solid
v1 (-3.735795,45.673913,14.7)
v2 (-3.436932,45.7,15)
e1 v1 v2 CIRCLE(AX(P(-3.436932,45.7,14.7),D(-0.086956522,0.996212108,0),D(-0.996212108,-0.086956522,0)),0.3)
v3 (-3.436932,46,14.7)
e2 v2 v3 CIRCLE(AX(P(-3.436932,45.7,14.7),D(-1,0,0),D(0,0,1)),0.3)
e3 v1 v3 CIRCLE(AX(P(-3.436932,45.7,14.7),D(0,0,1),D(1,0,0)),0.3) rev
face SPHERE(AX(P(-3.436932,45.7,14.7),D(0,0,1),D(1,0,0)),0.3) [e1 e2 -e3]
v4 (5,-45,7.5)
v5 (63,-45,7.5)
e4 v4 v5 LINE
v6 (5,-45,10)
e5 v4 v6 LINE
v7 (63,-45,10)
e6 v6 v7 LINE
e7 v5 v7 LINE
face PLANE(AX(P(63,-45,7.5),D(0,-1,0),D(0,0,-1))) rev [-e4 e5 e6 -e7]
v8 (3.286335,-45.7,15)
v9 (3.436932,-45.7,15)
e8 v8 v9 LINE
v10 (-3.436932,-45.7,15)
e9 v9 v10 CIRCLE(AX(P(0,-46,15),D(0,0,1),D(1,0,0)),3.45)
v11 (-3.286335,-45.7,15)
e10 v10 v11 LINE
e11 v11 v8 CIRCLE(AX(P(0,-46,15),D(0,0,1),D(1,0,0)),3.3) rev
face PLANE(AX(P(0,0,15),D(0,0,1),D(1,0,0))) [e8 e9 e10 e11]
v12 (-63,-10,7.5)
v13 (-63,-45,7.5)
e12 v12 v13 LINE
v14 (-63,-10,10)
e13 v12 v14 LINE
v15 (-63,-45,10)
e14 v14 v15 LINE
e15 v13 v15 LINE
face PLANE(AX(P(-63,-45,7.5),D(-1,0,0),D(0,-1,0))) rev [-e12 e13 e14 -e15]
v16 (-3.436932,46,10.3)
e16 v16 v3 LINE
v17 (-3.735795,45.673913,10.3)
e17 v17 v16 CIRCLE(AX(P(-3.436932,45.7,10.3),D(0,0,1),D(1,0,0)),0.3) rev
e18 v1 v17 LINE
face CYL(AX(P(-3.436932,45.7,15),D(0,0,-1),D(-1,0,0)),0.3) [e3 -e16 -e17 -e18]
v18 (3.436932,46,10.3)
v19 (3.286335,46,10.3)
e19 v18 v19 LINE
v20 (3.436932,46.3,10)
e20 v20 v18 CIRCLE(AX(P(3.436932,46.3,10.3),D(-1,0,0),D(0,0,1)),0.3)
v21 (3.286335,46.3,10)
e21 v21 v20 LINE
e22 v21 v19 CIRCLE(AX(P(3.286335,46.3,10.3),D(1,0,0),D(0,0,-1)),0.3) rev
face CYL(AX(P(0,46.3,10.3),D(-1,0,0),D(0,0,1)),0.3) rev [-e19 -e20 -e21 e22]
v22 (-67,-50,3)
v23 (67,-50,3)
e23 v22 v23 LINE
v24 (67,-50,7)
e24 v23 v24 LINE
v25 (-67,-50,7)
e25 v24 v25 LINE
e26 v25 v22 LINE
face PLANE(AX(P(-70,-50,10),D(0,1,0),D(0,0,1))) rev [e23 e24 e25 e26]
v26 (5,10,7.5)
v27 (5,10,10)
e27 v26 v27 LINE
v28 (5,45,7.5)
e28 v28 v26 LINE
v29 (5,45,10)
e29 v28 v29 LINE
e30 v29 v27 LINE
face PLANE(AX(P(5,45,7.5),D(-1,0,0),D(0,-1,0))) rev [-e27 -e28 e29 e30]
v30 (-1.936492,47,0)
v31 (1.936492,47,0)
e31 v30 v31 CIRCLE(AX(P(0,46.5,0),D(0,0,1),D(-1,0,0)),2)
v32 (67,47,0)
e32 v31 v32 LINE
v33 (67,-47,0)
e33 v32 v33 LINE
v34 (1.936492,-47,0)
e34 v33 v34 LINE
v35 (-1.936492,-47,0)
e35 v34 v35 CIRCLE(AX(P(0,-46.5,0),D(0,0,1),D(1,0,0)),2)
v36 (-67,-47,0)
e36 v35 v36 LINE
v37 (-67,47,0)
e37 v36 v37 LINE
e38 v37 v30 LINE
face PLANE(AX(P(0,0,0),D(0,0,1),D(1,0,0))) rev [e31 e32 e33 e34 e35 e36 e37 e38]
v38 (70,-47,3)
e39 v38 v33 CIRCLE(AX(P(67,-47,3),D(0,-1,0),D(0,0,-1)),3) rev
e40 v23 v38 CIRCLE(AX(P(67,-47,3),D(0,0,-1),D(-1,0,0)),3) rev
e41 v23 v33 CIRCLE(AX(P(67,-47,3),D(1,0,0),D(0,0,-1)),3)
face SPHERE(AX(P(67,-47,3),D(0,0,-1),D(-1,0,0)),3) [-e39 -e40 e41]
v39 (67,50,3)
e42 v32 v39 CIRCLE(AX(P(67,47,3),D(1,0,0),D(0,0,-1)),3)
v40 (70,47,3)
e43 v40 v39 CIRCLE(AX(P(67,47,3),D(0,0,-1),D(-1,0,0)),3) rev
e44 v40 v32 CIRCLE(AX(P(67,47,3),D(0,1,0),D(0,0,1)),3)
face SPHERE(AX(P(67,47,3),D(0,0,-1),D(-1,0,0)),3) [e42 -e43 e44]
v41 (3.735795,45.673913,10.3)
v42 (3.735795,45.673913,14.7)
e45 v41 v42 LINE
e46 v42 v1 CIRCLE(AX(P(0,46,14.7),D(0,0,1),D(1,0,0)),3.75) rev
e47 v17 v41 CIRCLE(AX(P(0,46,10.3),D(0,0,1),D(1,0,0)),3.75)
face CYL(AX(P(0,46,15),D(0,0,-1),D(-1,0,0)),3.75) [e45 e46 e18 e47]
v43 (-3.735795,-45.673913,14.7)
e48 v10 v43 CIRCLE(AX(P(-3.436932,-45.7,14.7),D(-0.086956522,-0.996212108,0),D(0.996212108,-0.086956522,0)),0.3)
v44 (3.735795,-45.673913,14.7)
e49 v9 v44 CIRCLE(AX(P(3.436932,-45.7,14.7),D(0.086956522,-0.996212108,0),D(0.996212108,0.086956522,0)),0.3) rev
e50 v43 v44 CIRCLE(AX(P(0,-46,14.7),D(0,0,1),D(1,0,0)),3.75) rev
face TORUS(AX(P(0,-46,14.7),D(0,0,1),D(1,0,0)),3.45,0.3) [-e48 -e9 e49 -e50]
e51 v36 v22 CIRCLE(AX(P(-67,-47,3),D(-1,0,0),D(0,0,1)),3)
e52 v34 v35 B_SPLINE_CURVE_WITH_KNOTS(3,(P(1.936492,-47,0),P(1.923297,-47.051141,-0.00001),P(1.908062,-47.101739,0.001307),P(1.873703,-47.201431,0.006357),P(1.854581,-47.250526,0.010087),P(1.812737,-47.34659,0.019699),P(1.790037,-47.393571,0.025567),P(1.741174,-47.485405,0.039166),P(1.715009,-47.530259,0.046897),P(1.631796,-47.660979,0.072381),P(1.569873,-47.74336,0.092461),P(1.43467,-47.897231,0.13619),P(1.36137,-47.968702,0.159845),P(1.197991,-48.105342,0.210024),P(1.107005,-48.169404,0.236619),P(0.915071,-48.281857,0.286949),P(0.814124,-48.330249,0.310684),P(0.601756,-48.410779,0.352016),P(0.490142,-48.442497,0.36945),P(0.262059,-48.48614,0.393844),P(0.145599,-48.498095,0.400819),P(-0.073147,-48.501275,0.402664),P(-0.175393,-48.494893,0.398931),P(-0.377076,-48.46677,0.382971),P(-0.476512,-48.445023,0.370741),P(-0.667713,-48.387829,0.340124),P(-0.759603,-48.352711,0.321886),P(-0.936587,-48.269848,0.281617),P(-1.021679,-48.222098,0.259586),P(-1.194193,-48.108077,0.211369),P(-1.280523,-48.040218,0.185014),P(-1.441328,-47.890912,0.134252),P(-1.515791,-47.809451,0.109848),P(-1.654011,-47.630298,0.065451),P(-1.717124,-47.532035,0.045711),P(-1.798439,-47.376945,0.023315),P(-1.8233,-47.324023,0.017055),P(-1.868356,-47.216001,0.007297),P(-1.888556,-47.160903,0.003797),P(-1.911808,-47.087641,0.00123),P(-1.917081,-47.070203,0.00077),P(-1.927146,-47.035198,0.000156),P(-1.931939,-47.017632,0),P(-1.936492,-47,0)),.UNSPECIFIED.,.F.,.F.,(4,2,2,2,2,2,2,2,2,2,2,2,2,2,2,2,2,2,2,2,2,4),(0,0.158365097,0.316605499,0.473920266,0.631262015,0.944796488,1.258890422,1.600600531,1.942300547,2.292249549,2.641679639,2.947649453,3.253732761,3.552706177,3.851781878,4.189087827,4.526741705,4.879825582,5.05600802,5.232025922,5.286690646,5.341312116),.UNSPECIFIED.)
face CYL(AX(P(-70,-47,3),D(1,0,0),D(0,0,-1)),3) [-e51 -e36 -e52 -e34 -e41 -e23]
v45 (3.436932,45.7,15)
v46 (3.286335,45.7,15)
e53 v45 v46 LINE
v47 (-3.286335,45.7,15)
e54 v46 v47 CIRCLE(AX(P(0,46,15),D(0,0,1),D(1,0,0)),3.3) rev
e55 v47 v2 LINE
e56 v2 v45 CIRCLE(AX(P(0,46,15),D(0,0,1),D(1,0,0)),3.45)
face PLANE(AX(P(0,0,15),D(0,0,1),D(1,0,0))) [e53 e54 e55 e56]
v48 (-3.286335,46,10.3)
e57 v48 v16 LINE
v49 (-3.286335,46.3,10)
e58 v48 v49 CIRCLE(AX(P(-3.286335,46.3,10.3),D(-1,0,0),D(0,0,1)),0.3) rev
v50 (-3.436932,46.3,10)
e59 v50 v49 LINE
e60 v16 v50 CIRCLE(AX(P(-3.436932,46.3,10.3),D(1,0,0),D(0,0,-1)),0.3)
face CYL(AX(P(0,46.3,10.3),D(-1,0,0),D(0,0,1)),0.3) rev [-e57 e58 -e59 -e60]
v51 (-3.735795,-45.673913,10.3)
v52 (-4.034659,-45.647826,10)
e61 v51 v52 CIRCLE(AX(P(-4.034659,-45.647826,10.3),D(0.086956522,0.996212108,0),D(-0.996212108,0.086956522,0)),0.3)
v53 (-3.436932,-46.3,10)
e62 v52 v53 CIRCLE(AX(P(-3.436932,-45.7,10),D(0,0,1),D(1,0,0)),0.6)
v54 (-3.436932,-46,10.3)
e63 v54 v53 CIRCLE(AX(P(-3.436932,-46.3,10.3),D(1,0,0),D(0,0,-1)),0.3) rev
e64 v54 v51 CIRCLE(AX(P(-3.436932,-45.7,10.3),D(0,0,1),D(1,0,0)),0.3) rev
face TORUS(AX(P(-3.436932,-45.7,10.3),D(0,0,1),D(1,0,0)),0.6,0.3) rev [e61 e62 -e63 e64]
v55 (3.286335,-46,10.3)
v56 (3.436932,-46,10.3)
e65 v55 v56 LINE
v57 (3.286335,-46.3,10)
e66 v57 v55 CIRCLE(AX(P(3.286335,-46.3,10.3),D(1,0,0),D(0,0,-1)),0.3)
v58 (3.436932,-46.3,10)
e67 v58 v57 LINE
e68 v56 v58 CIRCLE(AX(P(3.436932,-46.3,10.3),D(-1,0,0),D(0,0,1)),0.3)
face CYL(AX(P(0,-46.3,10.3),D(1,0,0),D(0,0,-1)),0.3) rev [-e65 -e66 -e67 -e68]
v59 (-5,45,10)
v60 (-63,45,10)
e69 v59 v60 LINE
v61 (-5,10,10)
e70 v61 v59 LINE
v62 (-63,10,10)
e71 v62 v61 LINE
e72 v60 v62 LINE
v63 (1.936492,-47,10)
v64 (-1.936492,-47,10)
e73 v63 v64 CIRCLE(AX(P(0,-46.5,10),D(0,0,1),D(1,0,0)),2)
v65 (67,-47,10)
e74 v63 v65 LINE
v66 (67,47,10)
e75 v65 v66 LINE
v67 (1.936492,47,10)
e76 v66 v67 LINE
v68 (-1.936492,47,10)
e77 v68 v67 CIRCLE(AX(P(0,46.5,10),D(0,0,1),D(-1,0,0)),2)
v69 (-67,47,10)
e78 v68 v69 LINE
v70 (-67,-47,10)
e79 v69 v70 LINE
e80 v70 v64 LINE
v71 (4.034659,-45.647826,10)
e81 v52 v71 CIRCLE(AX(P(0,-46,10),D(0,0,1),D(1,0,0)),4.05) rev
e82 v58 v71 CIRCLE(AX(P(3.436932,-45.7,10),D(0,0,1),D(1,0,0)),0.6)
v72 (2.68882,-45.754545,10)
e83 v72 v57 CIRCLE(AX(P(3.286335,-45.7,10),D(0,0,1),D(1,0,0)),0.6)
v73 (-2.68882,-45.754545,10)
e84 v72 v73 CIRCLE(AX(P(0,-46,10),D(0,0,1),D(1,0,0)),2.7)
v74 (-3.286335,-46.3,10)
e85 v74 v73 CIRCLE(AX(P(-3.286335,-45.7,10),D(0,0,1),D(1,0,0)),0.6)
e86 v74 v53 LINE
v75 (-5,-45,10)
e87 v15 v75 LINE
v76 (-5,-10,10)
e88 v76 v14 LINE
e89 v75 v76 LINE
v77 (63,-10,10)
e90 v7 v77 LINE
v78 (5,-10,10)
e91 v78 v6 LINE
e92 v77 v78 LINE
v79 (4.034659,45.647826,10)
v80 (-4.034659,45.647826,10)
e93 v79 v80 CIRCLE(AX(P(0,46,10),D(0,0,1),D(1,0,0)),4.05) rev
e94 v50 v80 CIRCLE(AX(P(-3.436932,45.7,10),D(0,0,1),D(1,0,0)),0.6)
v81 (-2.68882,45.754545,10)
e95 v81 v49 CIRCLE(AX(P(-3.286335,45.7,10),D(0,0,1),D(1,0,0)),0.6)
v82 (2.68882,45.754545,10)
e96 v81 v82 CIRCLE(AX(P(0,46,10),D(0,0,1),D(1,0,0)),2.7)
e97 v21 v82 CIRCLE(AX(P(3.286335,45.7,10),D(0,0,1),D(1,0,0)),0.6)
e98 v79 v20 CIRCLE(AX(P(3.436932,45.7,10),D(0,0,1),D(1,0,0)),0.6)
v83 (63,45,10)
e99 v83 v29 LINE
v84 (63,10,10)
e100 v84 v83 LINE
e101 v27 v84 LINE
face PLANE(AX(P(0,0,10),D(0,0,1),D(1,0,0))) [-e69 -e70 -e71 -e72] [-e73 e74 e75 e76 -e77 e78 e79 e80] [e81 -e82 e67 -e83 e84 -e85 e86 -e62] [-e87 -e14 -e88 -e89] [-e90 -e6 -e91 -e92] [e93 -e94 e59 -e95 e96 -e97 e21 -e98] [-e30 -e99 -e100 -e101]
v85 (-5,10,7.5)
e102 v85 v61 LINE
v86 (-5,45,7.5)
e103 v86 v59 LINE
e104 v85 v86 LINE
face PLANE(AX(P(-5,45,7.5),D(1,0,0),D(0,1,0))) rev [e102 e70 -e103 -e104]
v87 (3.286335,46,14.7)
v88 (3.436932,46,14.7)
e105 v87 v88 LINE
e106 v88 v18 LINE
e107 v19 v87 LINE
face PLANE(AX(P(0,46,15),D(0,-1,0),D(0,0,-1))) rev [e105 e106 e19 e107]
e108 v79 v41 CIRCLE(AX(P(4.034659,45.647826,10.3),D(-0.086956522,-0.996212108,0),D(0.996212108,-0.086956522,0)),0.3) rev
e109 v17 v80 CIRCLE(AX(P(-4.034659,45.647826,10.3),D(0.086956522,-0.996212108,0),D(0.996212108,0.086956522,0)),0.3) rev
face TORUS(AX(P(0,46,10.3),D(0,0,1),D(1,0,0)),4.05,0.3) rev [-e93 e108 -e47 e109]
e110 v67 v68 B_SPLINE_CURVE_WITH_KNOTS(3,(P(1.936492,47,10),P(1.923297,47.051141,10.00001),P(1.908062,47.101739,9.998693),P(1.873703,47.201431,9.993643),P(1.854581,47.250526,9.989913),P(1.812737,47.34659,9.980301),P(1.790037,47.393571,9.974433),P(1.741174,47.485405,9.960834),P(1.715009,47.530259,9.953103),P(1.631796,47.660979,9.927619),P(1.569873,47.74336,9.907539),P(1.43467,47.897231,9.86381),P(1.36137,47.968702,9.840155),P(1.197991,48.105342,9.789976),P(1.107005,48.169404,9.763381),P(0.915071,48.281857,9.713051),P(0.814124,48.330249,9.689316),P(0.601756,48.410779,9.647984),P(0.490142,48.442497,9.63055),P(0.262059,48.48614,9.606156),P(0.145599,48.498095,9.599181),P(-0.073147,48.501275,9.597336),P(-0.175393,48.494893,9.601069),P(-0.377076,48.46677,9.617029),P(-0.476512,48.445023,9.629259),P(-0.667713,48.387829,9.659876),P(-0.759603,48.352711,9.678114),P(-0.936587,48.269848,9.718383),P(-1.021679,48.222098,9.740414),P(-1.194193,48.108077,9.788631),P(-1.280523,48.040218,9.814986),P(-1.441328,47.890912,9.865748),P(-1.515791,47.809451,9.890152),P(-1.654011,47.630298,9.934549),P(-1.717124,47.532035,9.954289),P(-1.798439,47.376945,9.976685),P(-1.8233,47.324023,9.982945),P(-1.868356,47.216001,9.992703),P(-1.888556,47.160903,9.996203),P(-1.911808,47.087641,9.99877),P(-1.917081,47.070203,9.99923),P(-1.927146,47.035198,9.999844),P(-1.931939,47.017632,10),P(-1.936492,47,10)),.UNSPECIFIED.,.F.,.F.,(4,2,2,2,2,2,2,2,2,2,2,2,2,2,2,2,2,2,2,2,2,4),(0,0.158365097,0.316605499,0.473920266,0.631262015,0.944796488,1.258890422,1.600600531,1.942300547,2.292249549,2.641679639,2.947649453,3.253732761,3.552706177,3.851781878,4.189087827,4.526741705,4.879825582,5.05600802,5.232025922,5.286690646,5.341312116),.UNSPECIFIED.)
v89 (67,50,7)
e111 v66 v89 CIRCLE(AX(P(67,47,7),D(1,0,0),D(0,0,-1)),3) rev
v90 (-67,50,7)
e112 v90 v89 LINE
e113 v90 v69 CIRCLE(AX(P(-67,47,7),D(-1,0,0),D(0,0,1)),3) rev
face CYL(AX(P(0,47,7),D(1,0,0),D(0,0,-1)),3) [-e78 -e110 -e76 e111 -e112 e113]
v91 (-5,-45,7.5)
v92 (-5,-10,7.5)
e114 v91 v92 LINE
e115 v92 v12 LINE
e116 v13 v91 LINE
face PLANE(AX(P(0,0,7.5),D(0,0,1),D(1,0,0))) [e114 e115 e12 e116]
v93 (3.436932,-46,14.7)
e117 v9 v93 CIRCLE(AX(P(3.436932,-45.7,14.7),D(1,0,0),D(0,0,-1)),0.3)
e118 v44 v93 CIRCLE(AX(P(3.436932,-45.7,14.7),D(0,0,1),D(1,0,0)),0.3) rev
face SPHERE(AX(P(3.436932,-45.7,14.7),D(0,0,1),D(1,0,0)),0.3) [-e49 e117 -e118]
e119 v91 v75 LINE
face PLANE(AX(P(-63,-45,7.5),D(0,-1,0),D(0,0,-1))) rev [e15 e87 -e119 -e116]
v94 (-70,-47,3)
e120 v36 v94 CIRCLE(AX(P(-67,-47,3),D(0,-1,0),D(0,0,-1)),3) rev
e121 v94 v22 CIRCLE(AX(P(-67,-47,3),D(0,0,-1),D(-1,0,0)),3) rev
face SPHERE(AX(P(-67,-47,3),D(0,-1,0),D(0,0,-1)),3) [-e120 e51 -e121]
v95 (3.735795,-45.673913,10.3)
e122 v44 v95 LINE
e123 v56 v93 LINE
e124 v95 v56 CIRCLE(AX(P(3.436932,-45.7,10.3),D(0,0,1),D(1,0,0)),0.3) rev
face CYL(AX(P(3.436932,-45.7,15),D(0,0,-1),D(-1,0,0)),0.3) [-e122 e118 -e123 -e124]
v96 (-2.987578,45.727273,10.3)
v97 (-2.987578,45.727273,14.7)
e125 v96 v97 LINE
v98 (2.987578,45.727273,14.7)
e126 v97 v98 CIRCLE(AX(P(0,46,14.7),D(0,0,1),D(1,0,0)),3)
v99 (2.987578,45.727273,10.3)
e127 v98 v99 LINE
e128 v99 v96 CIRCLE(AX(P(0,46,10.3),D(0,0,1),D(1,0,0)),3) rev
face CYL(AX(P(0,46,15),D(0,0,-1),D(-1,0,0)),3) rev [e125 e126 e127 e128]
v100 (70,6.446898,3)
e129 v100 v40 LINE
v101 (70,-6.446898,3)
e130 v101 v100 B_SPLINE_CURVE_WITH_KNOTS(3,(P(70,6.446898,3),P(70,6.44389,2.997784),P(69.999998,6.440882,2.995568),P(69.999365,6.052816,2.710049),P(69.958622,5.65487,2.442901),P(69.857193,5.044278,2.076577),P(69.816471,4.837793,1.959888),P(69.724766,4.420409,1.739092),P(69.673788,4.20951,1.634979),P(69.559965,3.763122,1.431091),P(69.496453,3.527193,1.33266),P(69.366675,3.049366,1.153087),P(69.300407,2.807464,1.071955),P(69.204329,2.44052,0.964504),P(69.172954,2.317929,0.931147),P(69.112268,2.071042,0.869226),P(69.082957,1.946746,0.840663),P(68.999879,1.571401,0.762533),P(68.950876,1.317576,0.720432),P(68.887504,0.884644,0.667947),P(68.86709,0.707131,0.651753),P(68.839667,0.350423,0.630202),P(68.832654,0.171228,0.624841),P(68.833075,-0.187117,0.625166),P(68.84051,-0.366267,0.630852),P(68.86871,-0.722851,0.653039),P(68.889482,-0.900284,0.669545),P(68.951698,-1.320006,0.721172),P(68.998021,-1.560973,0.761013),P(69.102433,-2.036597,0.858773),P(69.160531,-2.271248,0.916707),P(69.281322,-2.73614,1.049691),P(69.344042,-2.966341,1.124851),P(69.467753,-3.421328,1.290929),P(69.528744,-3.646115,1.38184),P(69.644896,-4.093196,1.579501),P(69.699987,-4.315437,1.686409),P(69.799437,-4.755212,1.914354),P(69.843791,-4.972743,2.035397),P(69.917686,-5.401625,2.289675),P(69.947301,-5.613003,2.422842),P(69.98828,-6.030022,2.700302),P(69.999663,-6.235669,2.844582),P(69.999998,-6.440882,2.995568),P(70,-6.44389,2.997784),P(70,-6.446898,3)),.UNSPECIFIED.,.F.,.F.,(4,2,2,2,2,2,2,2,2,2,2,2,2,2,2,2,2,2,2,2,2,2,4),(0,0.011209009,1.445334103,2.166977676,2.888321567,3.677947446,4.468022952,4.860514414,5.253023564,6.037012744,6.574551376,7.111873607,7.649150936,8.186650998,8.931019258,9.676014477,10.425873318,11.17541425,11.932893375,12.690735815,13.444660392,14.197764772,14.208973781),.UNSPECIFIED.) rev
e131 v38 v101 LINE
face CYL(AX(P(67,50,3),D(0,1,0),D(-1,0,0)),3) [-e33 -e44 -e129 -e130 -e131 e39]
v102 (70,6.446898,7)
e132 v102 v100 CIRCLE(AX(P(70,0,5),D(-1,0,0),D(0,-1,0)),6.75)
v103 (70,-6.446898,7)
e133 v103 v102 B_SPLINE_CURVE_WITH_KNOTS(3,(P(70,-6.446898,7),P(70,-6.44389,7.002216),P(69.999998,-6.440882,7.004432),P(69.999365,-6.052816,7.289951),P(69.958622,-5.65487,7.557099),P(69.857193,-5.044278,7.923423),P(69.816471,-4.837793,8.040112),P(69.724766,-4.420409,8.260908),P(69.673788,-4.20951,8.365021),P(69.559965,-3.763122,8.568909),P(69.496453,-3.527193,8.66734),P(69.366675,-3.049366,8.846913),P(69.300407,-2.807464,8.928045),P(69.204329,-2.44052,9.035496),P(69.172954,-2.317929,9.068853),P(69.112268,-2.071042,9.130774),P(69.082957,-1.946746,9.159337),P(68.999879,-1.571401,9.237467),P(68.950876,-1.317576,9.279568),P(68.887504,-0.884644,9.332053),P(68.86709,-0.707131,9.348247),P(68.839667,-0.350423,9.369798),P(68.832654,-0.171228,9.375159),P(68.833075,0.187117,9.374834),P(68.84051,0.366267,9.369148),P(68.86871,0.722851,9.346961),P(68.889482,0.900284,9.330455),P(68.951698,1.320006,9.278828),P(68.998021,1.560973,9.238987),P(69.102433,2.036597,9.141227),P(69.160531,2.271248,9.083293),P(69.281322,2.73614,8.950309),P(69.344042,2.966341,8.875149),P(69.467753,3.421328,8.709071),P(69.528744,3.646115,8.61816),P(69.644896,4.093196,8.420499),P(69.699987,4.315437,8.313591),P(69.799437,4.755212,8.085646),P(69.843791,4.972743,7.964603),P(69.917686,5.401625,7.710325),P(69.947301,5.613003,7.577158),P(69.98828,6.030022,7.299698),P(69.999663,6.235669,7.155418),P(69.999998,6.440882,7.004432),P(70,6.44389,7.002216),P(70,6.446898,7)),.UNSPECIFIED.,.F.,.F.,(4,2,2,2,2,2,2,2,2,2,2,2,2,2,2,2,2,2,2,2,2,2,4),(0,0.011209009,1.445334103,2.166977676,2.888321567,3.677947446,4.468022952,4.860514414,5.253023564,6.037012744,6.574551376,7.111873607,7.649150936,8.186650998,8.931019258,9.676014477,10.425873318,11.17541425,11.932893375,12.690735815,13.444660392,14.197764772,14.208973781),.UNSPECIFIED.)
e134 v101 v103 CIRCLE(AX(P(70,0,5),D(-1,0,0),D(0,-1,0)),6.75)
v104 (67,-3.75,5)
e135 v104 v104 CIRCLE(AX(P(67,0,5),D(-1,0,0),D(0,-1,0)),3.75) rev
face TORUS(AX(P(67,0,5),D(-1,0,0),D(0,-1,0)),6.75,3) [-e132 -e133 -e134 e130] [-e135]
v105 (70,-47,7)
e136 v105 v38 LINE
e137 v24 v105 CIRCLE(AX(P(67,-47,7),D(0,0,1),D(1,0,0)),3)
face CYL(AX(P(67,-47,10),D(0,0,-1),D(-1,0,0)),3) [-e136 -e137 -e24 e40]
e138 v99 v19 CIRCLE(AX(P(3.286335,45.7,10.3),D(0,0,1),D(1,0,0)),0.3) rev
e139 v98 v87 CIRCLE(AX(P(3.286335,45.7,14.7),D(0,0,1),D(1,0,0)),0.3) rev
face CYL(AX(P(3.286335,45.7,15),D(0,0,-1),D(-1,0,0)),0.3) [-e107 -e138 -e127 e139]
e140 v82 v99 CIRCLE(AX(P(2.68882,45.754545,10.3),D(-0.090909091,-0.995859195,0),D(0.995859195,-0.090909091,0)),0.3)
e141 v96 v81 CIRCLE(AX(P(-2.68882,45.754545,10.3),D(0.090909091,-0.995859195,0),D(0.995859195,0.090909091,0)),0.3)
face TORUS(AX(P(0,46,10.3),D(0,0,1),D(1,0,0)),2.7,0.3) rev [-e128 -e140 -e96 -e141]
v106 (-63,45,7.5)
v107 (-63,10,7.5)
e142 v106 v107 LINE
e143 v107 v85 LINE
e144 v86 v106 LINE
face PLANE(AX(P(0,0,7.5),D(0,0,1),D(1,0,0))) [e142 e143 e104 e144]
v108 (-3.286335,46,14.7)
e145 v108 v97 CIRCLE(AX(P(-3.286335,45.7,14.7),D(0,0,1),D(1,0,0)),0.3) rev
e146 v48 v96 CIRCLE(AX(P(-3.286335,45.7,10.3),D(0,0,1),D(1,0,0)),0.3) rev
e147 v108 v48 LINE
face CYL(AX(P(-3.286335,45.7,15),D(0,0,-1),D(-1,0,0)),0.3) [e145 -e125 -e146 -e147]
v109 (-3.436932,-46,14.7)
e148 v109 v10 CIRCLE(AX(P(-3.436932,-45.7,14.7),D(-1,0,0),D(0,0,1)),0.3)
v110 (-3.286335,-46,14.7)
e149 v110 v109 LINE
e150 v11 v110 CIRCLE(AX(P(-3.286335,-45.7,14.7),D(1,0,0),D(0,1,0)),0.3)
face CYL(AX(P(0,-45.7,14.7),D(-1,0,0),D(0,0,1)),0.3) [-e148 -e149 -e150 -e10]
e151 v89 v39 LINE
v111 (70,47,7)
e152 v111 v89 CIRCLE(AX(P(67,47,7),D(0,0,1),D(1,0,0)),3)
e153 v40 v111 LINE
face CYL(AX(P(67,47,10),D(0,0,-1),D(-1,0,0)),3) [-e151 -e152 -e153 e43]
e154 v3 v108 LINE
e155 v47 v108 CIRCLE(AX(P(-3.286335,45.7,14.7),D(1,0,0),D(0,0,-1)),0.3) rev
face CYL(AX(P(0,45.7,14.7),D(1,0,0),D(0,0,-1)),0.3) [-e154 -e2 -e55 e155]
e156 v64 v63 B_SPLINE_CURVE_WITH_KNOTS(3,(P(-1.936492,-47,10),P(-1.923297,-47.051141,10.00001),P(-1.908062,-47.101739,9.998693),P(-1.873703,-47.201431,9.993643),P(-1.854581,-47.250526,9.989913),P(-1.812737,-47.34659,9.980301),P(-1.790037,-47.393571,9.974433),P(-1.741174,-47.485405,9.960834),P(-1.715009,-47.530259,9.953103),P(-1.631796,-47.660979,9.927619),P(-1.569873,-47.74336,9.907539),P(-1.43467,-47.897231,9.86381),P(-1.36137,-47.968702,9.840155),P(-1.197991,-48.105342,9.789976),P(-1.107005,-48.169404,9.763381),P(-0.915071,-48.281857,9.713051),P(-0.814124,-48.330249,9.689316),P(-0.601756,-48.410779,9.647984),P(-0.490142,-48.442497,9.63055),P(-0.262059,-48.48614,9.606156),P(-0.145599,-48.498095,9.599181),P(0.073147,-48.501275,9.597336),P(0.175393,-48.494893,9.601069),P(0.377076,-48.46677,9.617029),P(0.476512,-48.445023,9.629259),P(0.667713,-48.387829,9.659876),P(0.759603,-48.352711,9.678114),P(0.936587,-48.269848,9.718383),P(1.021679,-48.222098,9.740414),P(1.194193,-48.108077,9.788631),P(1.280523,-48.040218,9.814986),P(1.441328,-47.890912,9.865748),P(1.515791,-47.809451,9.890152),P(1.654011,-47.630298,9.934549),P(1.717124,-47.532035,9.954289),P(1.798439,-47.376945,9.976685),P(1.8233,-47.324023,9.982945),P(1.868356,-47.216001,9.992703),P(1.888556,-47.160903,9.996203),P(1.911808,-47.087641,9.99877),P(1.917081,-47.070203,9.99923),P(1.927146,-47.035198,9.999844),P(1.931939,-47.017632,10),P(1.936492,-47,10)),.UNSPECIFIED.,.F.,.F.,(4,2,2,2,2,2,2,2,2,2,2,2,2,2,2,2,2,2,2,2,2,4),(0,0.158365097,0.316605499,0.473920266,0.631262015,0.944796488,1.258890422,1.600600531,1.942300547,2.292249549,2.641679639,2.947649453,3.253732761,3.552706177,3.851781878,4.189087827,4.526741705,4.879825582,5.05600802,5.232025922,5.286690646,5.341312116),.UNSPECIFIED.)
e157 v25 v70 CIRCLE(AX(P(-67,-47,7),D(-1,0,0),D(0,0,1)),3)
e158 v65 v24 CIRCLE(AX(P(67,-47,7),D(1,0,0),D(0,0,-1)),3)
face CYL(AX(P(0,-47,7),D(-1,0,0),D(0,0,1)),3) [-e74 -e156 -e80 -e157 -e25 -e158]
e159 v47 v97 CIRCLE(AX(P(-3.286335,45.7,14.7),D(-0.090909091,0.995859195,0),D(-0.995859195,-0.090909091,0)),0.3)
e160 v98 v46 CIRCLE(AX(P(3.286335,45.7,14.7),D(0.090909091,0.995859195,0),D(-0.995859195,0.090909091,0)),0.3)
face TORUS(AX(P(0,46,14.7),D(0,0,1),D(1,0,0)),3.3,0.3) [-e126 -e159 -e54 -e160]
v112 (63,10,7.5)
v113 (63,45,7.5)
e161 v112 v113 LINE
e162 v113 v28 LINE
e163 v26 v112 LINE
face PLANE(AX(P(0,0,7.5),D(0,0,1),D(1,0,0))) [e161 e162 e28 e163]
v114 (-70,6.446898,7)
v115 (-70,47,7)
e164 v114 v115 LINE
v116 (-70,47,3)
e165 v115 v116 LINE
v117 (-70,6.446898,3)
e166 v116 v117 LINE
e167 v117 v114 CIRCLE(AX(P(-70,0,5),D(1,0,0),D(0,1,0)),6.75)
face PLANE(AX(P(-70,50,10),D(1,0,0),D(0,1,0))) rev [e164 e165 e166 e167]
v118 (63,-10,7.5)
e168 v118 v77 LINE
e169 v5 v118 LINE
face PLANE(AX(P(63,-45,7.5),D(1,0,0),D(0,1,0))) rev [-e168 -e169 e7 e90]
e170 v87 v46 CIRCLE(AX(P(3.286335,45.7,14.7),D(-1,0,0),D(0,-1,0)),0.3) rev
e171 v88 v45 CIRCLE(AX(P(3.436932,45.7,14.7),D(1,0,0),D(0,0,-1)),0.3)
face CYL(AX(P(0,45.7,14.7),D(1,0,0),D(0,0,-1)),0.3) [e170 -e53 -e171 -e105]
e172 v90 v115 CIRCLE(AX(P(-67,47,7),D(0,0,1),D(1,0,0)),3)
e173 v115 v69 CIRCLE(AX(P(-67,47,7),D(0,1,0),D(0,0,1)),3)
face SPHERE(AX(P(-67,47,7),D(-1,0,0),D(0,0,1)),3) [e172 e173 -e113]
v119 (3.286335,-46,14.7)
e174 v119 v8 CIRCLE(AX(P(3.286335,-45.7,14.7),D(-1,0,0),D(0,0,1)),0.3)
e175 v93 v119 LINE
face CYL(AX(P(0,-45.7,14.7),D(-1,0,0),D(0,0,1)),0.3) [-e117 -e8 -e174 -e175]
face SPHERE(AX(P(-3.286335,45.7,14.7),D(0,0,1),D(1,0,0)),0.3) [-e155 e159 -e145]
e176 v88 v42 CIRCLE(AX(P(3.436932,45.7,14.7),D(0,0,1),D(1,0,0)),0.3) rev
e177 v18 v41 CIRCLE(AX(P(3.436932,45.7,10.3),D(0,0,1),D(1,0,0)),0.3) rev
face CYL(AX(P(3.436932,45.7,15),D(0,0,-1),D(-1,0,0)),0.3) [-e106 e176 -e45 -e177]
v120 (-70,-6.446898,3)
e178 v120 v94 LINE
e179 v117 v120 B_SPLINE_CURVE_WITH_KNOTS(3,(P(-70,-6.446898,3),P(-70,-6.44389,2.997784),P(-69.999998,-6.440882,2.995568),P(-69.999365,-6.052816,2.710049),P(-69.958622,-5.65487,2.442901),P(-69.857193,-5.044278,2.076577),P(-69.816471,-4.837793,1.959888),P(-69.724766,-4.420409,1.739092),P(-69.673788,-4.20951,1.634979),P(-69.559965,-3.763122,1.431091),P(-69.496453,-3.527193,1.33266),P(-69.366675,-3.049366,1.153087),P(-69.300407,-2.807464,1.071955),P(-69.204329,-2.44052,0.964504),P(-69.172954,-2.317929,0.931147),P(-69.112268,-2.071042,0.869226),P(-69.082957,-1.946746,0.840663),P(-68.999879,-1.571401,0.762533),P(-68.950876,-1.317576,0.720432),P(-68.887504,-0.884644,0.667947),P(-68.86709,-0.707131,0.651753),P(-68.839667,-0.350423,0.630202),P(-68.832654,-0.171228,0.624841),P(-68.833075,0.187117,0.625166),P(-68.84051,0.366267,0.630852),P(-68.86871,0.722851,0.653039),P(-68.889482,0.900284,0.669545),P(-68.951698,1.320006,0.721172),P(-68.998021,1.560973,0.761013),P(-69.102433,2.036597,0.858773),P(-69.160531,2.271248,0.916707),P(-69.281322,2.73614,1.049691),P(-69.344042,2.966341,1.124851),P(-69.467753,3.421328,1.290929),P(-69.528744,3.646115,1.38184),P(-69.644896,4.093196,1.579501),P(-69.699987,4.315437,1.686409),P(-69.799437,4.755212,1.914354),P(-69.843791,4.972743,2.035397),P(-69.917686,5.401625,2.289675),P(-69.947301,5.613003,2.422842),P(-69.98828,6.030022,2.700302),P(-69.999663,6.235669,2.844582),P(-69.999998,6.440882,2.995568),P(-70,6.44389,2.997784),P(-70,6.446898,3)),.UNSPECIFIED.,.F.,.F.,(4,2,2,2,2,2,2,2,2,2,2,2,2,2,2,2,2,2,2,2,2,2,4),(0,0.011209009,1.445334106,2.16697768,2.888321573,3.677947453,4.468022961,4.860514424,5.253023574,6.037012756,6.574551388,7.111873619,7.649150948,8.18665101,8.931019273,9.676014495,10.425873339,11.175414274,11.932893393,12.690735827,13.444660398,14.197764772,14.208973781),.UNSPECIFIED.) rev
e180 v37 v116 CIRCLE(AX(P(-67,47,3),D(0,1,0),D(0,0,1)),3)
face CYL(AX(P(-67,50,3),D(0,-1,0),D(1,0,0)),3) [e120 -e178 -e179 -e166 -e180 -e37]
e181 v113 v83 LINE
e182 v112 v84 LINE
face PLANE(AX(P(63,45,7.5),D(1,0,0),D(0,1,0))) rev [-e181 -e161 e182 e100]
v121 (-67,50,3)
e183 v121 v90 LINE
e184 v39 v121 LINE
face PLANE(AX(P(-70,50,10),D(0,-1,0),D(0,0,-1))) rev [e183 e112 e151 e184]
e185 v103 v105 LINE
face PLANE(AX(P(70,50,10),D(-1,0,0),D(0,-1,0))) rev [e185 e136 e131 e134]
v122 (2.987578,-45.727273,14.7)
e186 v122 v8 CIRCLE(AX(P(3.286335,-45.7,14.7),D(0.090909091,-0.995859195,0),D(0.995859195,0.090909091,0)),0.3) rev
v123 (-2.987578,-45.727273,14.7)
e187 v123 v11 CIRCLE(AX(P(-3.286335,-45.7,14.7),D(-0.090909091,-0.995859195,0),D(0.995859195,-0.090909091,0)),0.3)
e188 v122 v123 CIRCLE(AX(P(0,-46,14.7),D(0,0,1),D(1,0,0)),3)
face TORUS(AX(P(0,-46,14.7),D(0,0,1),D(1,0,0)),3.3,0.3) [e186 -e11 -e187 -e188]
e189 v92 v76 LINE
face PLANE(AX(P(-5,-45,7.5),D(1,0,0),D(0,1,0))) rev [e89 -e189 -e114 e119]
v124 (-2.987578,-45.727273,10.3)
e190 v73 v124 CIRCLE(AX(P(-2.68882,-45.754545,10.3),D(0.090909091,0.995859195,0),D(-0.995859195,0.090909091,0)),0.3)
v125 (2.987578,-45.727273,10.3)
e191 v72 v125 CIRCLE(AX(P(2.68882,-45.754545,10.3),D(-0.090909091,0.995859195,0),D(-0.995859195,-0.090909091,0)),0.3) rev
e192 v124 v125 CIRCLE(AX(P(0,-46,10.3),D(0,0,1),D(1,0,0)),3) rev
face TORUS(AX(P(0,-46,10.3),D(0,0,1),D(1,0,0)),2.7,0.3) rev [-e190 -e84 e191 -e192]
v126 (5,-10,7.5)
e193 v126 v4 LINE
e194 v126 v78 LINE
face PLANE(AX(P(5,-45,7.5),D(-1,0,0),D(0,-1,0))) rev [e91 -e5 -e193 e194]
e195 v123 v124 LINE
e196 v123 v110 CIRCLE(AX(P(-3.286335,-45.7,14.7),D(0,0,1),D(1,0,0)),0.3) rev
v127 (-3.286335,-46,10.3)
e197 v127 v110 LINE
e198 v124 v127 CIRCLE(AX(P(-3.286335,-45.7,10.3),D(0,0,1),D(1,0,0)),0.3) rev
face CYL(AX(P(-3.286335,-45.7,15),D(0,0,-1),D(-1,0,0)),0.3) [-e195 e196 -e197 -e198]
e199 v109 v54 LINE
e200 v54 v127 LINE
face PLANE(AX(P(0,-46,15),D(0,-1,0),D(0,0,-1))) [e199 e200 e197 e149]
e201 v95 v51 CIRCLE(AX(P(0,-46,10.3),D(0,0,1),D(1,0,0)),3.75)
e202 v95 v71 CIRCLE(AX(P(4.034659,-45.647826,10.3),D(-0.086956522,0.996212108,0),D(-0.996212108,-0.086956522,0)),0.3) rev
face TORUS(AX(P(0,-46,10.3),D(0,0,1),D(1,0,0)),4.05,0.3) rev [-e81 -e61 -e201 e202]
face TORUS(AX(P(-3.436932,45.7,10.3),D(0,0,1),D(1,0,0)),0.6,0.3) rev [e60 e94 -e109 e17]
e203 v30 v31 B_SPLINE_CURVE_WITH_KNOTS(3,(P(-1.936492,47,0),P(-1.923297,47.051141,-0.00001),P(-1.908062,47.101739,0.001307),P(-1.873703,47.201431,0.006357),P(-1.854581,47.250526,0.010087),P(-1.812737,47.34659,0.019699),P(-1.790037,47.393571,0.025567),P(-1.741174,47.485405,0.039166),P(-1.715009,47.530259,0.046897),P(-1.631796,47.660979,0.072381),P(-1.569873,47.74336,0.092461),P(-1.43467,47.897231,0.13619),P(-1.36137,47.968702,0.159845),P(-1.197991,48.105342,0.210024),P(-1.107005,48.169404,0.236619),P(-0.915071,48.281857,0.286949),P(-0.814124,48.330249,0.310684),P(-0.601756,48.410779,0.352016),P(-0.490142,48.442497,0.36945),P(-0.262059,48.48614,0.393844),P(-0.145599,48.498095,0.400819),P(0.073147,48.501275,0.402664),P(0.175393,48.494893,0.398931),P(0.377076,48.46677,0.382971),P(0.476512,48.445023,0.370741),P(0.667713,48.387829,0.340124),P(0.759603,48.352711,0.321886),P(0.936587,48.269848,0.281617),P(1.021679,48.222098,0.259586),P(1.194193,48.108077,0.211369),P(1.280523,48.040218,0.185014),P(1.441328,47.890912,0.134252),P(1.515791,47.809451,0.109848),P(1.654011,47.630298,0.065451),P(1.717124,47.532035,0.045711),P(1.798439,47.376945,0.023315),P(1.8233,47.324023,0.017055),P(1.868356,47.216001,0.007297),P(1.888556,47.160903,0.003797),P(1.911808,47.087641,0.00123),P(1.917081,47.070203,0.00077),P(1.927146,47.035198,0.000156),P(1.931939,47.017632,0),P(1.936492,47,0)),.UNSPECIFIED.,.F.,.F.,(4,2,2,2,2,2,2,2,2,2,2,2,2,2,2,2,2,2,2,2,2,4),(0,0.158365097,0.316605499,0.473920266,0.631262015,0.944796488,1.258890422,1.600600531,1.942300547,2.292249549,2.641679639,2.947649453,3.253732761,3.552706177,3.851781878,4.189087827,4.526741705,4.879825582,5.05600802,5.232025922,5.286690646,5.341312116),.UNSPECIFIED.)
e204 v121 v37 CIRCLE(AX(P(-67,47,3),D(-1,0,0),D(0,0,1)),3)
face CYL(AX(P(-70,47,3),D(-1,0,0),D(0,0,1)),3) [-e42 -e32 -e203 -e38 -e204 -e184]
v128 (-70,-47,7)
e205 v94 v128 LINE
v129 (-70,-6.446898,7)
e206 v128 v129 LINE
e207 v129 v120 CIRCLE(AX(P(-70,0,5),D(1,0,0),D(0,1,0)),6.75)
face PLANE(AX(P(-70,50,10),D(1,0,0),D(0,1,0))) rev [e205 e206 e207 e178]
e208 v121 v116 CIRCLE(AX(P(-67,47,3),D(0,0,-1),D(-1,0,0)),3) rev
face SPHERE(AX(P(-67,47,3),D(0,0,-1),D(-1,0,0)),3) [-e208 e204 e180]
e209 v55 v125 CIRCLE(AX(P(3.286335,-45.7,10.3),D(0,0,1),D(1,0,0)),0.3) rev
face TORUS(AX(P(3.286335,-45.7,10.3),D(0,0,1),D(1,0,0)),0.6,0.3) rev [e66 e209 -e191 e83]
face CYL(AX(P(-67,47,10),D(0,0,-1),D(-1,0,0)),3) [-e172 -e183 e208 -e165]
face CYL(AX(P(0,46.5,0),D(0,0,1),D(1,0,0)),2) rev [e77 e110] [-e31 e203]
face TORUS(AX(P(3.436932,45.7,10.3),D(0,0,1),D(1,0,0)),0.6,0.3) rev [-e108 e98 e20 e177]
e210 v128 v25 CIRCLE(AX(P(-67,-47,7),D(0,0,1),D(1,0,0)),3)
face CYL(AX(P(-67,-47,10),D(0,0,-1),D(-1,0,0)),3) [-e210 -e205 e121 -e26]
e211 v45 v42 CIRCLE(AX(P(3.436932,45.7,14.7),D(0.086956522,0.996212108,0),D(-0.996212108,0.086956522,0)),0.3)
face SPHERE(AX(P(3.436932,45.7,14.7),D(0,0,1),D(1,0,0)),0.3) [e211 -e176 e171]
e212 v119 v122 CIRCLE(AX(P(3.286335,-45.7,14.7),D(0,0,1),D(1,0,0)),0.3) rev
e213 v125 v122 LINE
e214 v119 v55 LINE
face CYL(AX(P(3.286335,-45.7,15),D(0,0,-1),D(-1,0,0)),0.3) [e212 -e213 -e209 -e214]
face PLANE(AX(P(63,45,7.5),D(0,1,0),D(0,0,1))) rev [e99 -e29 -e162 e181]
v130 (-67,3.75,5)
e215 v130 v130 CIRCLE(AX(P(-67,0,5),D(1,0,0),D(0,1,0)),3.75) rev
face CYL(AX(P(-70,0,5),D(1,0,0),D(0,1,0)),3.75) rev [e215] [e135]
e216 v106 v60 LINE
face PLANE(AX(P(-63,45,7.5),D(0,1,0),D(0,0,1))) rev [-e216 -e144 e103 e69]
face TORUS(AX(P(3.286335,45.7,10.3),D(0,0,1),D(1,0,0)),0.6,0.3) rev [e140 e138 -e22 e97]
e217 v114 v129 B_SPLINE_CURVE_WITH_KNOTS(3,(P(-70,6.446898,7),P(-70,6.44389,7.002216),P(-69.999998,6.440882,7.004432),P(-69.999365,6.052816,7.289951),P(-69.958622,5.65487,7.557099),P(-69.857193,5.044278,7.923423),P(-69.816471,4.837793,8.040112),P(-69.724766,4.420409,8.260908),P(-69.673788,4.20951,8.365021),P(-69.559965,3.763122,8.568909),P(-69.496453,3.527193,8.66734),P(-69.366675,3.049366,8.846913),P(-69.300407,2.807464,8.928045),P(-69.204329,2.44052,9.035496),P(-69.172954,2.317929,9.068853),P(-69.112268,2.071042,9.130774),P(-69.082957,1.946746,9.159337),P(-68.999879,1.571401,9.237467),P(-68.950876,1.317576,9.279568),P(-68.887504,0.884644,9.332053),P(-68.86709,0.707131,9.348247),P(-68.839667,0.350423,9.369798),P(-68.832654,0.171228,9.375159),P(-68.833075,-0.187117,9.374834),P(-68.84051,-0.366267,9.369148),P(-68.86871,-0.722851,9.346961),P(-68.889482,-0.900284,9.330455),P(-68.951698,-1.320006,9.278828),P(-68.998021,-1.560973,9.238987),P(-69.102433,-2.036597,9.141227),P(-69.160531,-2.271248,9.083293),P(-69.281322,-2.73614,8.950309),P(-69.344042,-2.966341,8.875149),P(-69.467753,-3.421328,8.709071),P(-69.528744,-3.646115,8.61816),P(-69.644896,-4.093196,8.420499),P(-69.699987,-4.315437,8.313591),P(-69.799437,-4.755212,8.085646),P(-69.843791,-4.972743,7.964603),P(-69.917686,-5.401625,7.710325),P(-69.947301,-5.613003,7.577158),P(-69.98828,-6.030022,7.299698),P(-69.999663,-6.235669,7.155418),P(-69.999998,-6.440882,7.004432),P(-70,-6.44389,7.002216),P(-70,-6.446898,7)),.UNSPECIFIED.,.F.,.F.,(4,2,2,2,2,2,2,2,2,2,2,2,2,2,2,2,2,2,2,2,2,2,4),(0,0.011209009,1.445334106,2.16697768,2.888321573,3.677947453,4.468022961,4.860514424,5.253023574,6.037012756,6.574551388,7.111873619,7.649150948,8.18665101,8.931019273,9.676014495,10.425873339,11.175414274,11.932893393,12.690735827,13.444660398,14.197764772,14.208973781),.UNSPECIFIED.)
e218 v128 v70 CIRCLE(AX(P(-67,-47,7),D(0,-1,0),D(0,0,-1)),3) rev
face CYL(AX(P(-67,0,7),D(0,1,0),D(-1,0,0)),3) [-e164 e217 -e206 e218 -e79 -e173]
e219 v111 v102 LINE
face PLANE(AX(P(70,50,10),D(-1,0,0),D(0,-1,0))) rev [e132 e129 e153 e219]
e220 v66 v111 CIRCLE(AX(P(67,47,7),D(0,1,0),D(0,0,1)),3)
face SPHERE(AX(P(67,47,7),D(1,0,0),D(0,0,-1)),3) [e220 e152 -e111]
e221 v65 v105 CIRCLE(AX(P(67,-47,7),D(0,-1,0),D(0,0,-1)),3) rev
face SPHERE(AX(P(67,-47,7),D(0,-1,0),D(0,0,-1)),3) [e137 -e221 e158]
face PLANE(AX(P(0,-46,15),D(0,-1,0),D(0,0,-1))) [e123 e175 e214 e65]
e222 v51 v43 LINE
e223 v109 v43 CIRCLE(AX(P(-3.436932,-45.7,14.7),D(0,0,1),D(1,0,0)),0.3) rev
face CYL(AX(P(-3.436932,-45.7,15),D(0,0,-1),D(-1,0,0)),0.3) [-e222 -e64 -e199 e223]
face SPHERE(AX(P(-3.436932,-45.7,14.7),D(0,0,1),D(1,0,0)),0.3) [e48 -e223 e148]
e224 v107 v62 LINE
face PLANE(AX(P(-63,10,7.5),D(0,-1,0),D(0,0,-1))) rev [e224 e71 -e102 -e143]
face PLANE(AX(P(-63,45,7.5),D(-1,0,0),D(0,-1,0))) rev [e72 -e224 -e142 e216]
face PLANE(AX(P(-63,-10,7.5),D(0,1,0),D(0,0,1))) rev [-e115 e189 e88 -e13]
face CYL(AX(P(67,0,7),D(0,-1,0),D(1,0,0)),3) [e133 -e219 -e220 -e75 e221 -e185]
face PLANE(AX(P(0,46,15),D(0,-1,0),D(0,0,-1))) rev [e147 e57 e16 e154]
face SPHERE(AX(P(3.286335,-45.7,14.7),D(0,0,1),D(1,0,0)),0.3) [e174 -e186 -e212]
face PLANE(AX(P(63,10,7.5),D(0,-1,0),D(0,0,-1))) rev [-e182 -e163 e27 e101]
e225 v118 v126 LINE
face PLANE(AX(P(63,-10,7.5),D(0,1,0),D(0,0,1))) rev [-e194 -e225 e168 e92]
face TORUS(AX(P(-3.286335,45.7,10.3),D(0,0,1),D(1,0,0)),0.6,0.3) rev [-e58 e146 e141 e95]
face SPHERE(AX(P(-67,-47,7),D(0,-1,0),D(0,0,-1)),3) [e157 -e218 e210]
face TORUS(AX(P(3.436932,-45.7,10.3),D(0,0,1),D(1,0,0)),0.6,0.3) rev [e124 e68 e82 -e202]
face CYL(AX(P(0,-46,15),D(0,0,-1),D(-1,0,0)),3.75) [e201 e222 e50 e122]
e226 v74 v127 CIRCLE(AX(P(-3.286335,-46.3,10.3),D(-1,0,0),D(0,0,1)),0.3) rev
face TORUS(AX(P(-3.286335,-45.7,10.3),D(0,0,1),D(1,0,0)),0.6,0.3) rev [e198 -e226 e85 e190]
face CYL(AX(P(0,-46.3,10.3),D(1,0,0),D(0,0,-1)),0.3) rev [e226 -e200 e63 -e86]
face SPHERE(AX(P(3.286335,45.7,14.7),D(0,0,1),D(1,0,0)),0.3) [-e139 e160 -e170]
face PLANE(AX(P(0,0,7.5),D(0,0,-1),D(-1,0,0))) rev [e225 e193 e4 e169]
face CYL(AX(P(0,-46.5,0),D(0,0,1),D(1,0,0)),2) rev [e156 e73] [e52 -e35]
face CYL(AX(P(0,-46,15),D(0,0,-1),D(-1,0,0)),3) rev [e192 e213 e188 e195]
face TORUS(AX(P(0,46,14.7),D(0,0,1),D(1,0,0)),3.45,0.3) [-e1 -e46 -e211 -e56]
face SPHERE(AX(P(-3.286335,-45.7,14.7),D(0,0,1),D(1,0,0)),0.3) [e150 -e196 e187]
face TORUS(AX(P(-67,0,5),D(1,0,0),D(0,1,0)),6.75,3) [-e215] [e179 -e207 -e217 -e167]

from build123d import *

# Parameters (mm, degrees)
SKETCH1_W           = 140
SKETCH1_H           = 100
BOSS_EXTRUDE1_DEPTH = 10
SKETCH2_W           = 58
SKETCH2_H           = 35
CUT_EXTRUDE1_DEPTH  = 2.5
SKETCH4_R           = 3.75
CUT_EXTRUDE2_DEPTH  = 140
BOSS_EXTRUDE3_DEPTH = 5
SKETCH6_R           = 2
CUT_EXTRUDE3_DEPTH  = 10
FILLET1_R           = 3
FILLET7_R           = 0.3


with BuildPart() as part:
    # Sketch1 → Boss-Extrude1 (new body)
    with BuildSketch(Plane.XY):
        Rectangle(SKETCH1_W, SKETCH1_H)
    extrude(amount=BOSS_EXTRUDE1_DEPTH)

    # Sketch2 → Cut-Extrude1 (cut)
    with BuildSketch(Plane.XY.offset(10)):
        with Locations((-34, 27.5)):
            Rectangle(SKETCH2_W, SKETCH2_H)
        with Locations((34, 27.5)):
            Rectangle(SKETCH2_W, SKETCH2_H)
        with Locations((34, -27.5)):
            Rectangle(SKETCH2_W, SKETCH2_H)
        with Locations((-34, -27.5)):
            Rectangle(SKETCH2_W, SKETCH2_H)
    extrude(amount=-CUT_EXTRUDE1_DEPTH, mode=Mode.SUBTRACT)

    # Sketch4 → Cut-Extrude2 (cut)
    with BuildSketch(Plane(origin=(70, 0, 0), x_dir=(0, 0, -1), z_dir=(1, 0, 0))):
        with Locations(Location((-5, 0, 0), (0, 0, 90))):
            Circle(SKETCH4_R)
    extrude(amount=-CUT_EXTRUDE2_DEPTH, mode=Mode.SUBTRACT)

    # Sketch5 → Boss-Extrude3 (add)
    with BuildSketch(Plane.XY.offset(10)):
        with BuildLine():
            ThreePointArc((-3.75, 46), (0, 42.25), (3.75, 46))
            Line((3.75, 46), (3, 46))
            ThreePointArc((3, 46), (0, 43), (-3, 46))
            Line((-3, 46), (-3.75, 46))
        make_face()
        with BuildLine():
            Line((3, -46), (3.75, -46))
            ThreePointArc((3.75, -46), (0, -42.25), (-3.75, -46))
            Line((-3.75, -46), (-3, -46))
            ThreePointArc((-3, -46), (0, -43), (3, -46))
        make_face()
    extrude(amount=BOSS_EXTRUDE3_DEPTH)

    # Sketch6 → Cut-Extrude3 (cut)
    with BuildSketch(Plane.XY.offset(10)):
        with Locations((0, -46.5)):
            Circle(SKETCH6_R)
        with Locations(Location((0, 46.5, 0), (0, 0, 180))):
            Circle(SKETCH6_R)
    extrude(amount=-CUT_EXTRUDE3_DEPTH, mode=Mode.SUBTRACT)

    # Fillet1
    # the kernel refuses this fillet: 3 mm, written as the material it takes off along each edge
    with BuildSketch(Plane(origin=(-67, -47, 7), x_dir=(0, 0, 1), z_dir=(-1, 0, 0))) as fillet1_piece_1_section:
        Polygon((0, 0), (FILLET1_R, 0), (FILLET1_R, -FILLET1_R), (0, -FILLET1_R), align=None)
    fillet1_piece_1 = extrude(amount=FILLET1_R, mode=Mode.PRIVATE)
    fillet1_piece_1 = fillet1_piece_1 - Plane(origin=(-67, -47, 7), x_dir=(0, 0.7071067811865475, -0.7071067811865475), z_dir=(-1, 0, 0)) * Sphere(FILLET1_R, mode=Mode.PRIVATE)
    add(fillet1_piece_1, mode=Mode.SUBTRACT)
    with BuildSketch(Plane(origin=(-67, 47, 7), x_dir=(-1, 0, 0), z_dir=(0, 1, 0))) as fillet1_piece_2_section:
        Polygon((0, 0), (FILLET1_R, 0), (FILLET1_R, FILLET1_R), (0, FILLET1_R), align=None)
    fillet1_piece_2 = extrude(amount=FILLET1_R, mode=Mode.PRIVATE)
    fillet1_piece_2 = fillet1_piece_2 - Plane(origin=(-67, 47, 7), x_dir=(0.7071067811865475, 0, -0.7071067811865475), z_dir=(0, 1, 0)) * Sphere(FILLET1_R, mode=Mode.PRIVATE)
    add(fillet1_piece_2, mode=Mode.SUBTRACT)
    with BuildSketch(Plane(origin=(67, -47, 7), x_dir=(0, 0, 1), z_dir=(1, 0, 0))) as fillet1_piece_3_section:
        Polygon((0, 0), (FILLET1_R, 0), (FILLET1_R, FILLET1_R), (0, FILLET1_R), align=None)
    fillet1_piece_3 = extrude(amount=FILLET1_R, mode=Mode.PRIVATE)
    fillet1_piece_3 = fillet1_piece_3 - Plane(origin=(67, -47, 7), x_dir=(0, 0.7071067811865475, -0.7071067811865475), z_dir=(1, 0, 0)) * Sphere(FILLET1_R, mode=Mode.PRIVATE)
    add(fillet1_piece_3, mode=Mode.SUBTRACT)
    with BuildSketch(Plane(origin=(67, 47, 7), x_dir=(1, 0, 0), z_dir=(0, 1, 0))) as fillet1_piece_4_section:
        Polygon((0, 0), (FILLET1_R, 0), (FILLET1_R, -FILLET1_R), (0, -FILLET1_R), align=None)
    fillet1_piece_4 = extrude(amount=FILLET1_R, mode=Mode.PRIVATE)
    fillet1_piece_4 = fillet1_piece_4 - Plane(origin=(67, 47, 7), x_dir=(-0.7071067811865475, 0, -0.7071067811865475), z_dir=(0, 1, 0)) * Sphere(FILLET1_R, mode=Mode.PRIVATE)
    add(fillet1_piece_4, mode=Mode.SUBTRACT)
    with BuildSketch(Plane(origin=(67, -47, 3), x_dir=(0, 0, -1), z_dir=(1, 0, 0))) as fillet1_piece_5_section:
        Polygon((0, 0), (FILLET1_R, 0), (FILLET1_R, -FILLET1_R), (0, -FILLET1_R), align=None)
    fillet1_piece_5 = extrude(amount=FILLET1_R, mode=Mode.PRIVATE)
    fillet1_piece_5 = fillet1_piece_5 - Plane(origin=(67, -47, 3), x_dir=(0, 0.7071067811865475, 0.7071067811865475), z_dir=(1, 0, 0)) * Sphere(FILLET1_R, mode=Mode.PRIVATE)
    add(fillet1_piece_5, mode=Mode.SUBTRACT)
    with BuildSketch(Plane(origin=(-67, -47, 3), x_dir=(0, 0, -1), z_dir=(-1, 0, 0))) as fillet1_piece_6_section:
        Polygon((0, 0), (FILLET1_R, 0), (FILLET1_R, FILLET1_R), (0, FILLET1_R), align=None)
    fillet1_piece_6 = extrude(amount=FILLET1_R, mode=Mode.PRIVATE)
    fillet1_piece_6 = fillet1_piece_6 - Plane(origin=(-67, -47, 3), x_dir=(0, 0.7071067811865475, 0.7071067811865475), z_dir=(-1, 0, 0)) * Sphere(FILLET1_R, mode=Mode.PRIVATE)
    add(fillet1_piece_6, mode=Mode.SUBTRACT)
    with BuildSketch(Plane(origin=(-67, 47, 3), x_dir=(-1, 0, 0), z_dir=(0, 1, 0))) as fillet1_piece_7_section:
        Polygon((0, 0), (FILLET1_R, 0), (FILLET1_R, -FILLET1_R), (0, -FILLET1_R), align=None)
    fillet1_piece_7 = extrude(amount=FILLET1_R, mode=Mode.PRIVATE)
    fillet1_piece_7 = fillet1_piece_7 - Plane(origin=(-67, 47, 3), x_dir=(0.7071067811865475, 0, 0.7071067811865475), z_dir=(0, 1, 0)) * Sphere(FILLET1_R, mode=Mode.PRIVATE)
    add(fillet1_piece_7, mode=Mode.SUBTRACT)
    with BuildSketch(Plane(origin=(67, 47, 3), x_dir=(1, 0, 0), z_dir=(0, 1, 0))) as fillet1_piece_8_section:
        Polygon((0, 0), (FILLET1_R, 0), (FILLET1_R, FILLET1_R), (0, FILLET1_R), align=None)
    fillet1_piece_8 = extrude(amount=FILLET1_R, mode=Mode.PRIVATE)
    fillet1_piece_8 = fillet1_piece_8 - Plane(origin=(67, 47, 3), x_dir=(-0.7071067811865475, 0, 0.7071067811865475), z_dir=(0, 1, 0)) * Sphere(FILLET1_R, mode=Mode.PRIVATE)
    add(fillet1_piece_8, mode=Mode.SUBTRACT)
    with BuildSketch(Plane(origin=(-70, -47, 10), x_dir=(0, 0, -1), z_dir=(0, 1, 0)), Plane(origin=(70, 47, 10), x_dir=(0, 0, -1), z_dir=(0, -1, 0))) as fillet1_piece_9:
        with BuildLine():
            CenterArc((FILLET1_R, -FILLET1_R), FILLET1_R, 90, 90)
            Line((0, -FILLET1_R), (0, 0))
            Line((0, 0), (FILLET1_R, 0))
        make_face()
    extrude(amount=94, mode=Mode.SUBTRACT)
    with BuildSketch(Plane(origin=(67, -50, 10), x_dir=(0, 1, 0), z_dir=(-1, 0, 0)), Plane(origin=(-67, 50, 0), x_dir=(0, 0, 1), z_dir=(1, 0, 0))) as fillet1_piece_10:
        with BuildLine():
            CenterArc((FILLET1_R, FILLET1_R), FILLET1_R, 180, 90)
            Line((0, FILLET1_R), (0, 0))
            Line((0, 0), (FILLET1_R, 0))
        make_face()
    extrude(amount=134, mode=Mode.SUBTRACT)
    with BuildSketch(Plane(origin=(67, -50, 0), x_dir=(0, 1, 0), z_dir=(-1, 0, 0)), Plane(origin=(-67, 50, 10), x_dir=(0, 0, -1), z_dir=(1, 0, 0))) as fillet1_piece_11:
        with BuildLine():
            CenterArc((FILLET1_R, -FILLET1_R), FILLET1_R, 90, 90)
            Line((0, -FILLET1_R), (0, 0))
            Line((0, 0), (FILLET1_R, 0))
        make_face()
    extrude(amount=134, mode=Mode.SUBTRACT)
    with BuildSketch(Plane(origin=(-70, -47, 0), x_dir=(0, 0, 1), z_dir=(0, 1, 0)), Plane(origin=(70, 47, 0), x_dir=(0, 0, 1), z_dir=(0, -1, 0))) as fillet1_piece_12:
        with BuildLine():
            CenterArc((FILLET1_R, FILLET1_R), FILLET1_R, 180, 90)
            Line((0, FILLET1_R), (0, 0))
            Line((0, 0), (FILLET1_R, 0))
        make_face()
    extrude(amount=94, mode=Mode.SUBTRACT)
    with BuildSketch(Plane(origin=(-70, 0, 5), x_dir=(0, 1, 0), z_dir=(0, 0, -1))) as fillet1_piece_13:
        with BuildLine():
            CenterArc((3.75 + FILLET1_R, FILLET1_R), FILLET1_R, 180, 90)
            Line((3.75, FILLET1_R), (3.75, 0))
            Line((3.75, 0), (3.75 + FILLET1_R, 0))
        make_face()
    revolve(axis=Axis((-70, 0, 5), (1, 0, 0)), mode=Mode.SUBTRACT)
    with BuildSketch(Plane(origin=(70, 0, 5), x_dir=(0, 1, 0), z_dir=(0, 0, -1))) as fillet1_piece_14:
        with BuildLine():
            CenterArc((3.75 + FILLET1_R, -FILLET1_R), FILLET1_R, 90, 90)
            Line((3.75, -FILLET1_R), (3.75, 0))
            Line((3.75, 0), (3.75 + FILLET1_R, 0))
        make_face()
    revolve(axis=Axis((70, 0, 5), (1, 0, 0)), mode=Mode.SUBTRACT)
    with BuildSketch(Plane(origin=(70, -50, 3), x_dir=(0, 1, 0), z_dir=(0, 0, 1)), Plane(origin=(70, 50, 3), x_dir=(-1, 0, 0), z_dir=(0, 0, 1))) as fillet1_piece_15:
        with BuildLine():
            CenterArc((FILLET1_R, FILLET1_R), FILLET1_R, 180, 90)
            Line((0, FILLET1_R), (0, 0))
            Line((0, 0), (FILLET1_R, 0))
        make_face()
    extrude(amount=4, mode=Mode.SUBTRACT)
    with BuildSketch(Plane(origin=(-70, -50, 3), x_dir=(0, 1, 0), z_dir=(0, 0, 1)), Plane(origin=(-70, 50, 3), x_dir=(1, 0, 0), z_dir=(0, 0, 1))) as fillet1_piece_16:
        with BuildLine():
            CenterArc((FILLET1_R, -FILLET1_R), FILLET1_R, 90, 90)
            Line((0, -FILLET1_R), (0, 0))
            Line((0, 0), (FILLET1_R, 0))
        make_face()
    extrude(amount=4, mode=Mode.SUBTRACT)

    # Fillet7
    fillet7_edges = [part.edges().sort_by_distance(p)[0] for p in [
        (0, 43, 15),
        (3, 46, 12.5),
        (-3.375, 46, 10),
        (-3, 46, 12.5),
        (0, 42.25, 10),
        (-3.75, 46, 12.5),
        (3.375, 46, 10),
        (3.75, 46, 12.5),
        (-3.375, 46, 15),
        (0, 42.25, 15),
        (3.375, 46, 15),
        (0, 43, 10),
        (0, -42.25, 15),
        (3.75, -46, 12.5),
        (-3.375, -46, 15),
        (-3.75, -46, 12.5),
        (0, -43, 10),
        (-3, -46, 12.5),
        (3.375, -46, 15),
        (3, -46, 12.5),
        (0, -43, 15),
        (0, -42.25, 10),
        (3.375, -46, 10),
        (-3.375, -46, 10),
    ]]
    fillet(fillet7_edges, radius=FILLET7_R)


solid = part.part
